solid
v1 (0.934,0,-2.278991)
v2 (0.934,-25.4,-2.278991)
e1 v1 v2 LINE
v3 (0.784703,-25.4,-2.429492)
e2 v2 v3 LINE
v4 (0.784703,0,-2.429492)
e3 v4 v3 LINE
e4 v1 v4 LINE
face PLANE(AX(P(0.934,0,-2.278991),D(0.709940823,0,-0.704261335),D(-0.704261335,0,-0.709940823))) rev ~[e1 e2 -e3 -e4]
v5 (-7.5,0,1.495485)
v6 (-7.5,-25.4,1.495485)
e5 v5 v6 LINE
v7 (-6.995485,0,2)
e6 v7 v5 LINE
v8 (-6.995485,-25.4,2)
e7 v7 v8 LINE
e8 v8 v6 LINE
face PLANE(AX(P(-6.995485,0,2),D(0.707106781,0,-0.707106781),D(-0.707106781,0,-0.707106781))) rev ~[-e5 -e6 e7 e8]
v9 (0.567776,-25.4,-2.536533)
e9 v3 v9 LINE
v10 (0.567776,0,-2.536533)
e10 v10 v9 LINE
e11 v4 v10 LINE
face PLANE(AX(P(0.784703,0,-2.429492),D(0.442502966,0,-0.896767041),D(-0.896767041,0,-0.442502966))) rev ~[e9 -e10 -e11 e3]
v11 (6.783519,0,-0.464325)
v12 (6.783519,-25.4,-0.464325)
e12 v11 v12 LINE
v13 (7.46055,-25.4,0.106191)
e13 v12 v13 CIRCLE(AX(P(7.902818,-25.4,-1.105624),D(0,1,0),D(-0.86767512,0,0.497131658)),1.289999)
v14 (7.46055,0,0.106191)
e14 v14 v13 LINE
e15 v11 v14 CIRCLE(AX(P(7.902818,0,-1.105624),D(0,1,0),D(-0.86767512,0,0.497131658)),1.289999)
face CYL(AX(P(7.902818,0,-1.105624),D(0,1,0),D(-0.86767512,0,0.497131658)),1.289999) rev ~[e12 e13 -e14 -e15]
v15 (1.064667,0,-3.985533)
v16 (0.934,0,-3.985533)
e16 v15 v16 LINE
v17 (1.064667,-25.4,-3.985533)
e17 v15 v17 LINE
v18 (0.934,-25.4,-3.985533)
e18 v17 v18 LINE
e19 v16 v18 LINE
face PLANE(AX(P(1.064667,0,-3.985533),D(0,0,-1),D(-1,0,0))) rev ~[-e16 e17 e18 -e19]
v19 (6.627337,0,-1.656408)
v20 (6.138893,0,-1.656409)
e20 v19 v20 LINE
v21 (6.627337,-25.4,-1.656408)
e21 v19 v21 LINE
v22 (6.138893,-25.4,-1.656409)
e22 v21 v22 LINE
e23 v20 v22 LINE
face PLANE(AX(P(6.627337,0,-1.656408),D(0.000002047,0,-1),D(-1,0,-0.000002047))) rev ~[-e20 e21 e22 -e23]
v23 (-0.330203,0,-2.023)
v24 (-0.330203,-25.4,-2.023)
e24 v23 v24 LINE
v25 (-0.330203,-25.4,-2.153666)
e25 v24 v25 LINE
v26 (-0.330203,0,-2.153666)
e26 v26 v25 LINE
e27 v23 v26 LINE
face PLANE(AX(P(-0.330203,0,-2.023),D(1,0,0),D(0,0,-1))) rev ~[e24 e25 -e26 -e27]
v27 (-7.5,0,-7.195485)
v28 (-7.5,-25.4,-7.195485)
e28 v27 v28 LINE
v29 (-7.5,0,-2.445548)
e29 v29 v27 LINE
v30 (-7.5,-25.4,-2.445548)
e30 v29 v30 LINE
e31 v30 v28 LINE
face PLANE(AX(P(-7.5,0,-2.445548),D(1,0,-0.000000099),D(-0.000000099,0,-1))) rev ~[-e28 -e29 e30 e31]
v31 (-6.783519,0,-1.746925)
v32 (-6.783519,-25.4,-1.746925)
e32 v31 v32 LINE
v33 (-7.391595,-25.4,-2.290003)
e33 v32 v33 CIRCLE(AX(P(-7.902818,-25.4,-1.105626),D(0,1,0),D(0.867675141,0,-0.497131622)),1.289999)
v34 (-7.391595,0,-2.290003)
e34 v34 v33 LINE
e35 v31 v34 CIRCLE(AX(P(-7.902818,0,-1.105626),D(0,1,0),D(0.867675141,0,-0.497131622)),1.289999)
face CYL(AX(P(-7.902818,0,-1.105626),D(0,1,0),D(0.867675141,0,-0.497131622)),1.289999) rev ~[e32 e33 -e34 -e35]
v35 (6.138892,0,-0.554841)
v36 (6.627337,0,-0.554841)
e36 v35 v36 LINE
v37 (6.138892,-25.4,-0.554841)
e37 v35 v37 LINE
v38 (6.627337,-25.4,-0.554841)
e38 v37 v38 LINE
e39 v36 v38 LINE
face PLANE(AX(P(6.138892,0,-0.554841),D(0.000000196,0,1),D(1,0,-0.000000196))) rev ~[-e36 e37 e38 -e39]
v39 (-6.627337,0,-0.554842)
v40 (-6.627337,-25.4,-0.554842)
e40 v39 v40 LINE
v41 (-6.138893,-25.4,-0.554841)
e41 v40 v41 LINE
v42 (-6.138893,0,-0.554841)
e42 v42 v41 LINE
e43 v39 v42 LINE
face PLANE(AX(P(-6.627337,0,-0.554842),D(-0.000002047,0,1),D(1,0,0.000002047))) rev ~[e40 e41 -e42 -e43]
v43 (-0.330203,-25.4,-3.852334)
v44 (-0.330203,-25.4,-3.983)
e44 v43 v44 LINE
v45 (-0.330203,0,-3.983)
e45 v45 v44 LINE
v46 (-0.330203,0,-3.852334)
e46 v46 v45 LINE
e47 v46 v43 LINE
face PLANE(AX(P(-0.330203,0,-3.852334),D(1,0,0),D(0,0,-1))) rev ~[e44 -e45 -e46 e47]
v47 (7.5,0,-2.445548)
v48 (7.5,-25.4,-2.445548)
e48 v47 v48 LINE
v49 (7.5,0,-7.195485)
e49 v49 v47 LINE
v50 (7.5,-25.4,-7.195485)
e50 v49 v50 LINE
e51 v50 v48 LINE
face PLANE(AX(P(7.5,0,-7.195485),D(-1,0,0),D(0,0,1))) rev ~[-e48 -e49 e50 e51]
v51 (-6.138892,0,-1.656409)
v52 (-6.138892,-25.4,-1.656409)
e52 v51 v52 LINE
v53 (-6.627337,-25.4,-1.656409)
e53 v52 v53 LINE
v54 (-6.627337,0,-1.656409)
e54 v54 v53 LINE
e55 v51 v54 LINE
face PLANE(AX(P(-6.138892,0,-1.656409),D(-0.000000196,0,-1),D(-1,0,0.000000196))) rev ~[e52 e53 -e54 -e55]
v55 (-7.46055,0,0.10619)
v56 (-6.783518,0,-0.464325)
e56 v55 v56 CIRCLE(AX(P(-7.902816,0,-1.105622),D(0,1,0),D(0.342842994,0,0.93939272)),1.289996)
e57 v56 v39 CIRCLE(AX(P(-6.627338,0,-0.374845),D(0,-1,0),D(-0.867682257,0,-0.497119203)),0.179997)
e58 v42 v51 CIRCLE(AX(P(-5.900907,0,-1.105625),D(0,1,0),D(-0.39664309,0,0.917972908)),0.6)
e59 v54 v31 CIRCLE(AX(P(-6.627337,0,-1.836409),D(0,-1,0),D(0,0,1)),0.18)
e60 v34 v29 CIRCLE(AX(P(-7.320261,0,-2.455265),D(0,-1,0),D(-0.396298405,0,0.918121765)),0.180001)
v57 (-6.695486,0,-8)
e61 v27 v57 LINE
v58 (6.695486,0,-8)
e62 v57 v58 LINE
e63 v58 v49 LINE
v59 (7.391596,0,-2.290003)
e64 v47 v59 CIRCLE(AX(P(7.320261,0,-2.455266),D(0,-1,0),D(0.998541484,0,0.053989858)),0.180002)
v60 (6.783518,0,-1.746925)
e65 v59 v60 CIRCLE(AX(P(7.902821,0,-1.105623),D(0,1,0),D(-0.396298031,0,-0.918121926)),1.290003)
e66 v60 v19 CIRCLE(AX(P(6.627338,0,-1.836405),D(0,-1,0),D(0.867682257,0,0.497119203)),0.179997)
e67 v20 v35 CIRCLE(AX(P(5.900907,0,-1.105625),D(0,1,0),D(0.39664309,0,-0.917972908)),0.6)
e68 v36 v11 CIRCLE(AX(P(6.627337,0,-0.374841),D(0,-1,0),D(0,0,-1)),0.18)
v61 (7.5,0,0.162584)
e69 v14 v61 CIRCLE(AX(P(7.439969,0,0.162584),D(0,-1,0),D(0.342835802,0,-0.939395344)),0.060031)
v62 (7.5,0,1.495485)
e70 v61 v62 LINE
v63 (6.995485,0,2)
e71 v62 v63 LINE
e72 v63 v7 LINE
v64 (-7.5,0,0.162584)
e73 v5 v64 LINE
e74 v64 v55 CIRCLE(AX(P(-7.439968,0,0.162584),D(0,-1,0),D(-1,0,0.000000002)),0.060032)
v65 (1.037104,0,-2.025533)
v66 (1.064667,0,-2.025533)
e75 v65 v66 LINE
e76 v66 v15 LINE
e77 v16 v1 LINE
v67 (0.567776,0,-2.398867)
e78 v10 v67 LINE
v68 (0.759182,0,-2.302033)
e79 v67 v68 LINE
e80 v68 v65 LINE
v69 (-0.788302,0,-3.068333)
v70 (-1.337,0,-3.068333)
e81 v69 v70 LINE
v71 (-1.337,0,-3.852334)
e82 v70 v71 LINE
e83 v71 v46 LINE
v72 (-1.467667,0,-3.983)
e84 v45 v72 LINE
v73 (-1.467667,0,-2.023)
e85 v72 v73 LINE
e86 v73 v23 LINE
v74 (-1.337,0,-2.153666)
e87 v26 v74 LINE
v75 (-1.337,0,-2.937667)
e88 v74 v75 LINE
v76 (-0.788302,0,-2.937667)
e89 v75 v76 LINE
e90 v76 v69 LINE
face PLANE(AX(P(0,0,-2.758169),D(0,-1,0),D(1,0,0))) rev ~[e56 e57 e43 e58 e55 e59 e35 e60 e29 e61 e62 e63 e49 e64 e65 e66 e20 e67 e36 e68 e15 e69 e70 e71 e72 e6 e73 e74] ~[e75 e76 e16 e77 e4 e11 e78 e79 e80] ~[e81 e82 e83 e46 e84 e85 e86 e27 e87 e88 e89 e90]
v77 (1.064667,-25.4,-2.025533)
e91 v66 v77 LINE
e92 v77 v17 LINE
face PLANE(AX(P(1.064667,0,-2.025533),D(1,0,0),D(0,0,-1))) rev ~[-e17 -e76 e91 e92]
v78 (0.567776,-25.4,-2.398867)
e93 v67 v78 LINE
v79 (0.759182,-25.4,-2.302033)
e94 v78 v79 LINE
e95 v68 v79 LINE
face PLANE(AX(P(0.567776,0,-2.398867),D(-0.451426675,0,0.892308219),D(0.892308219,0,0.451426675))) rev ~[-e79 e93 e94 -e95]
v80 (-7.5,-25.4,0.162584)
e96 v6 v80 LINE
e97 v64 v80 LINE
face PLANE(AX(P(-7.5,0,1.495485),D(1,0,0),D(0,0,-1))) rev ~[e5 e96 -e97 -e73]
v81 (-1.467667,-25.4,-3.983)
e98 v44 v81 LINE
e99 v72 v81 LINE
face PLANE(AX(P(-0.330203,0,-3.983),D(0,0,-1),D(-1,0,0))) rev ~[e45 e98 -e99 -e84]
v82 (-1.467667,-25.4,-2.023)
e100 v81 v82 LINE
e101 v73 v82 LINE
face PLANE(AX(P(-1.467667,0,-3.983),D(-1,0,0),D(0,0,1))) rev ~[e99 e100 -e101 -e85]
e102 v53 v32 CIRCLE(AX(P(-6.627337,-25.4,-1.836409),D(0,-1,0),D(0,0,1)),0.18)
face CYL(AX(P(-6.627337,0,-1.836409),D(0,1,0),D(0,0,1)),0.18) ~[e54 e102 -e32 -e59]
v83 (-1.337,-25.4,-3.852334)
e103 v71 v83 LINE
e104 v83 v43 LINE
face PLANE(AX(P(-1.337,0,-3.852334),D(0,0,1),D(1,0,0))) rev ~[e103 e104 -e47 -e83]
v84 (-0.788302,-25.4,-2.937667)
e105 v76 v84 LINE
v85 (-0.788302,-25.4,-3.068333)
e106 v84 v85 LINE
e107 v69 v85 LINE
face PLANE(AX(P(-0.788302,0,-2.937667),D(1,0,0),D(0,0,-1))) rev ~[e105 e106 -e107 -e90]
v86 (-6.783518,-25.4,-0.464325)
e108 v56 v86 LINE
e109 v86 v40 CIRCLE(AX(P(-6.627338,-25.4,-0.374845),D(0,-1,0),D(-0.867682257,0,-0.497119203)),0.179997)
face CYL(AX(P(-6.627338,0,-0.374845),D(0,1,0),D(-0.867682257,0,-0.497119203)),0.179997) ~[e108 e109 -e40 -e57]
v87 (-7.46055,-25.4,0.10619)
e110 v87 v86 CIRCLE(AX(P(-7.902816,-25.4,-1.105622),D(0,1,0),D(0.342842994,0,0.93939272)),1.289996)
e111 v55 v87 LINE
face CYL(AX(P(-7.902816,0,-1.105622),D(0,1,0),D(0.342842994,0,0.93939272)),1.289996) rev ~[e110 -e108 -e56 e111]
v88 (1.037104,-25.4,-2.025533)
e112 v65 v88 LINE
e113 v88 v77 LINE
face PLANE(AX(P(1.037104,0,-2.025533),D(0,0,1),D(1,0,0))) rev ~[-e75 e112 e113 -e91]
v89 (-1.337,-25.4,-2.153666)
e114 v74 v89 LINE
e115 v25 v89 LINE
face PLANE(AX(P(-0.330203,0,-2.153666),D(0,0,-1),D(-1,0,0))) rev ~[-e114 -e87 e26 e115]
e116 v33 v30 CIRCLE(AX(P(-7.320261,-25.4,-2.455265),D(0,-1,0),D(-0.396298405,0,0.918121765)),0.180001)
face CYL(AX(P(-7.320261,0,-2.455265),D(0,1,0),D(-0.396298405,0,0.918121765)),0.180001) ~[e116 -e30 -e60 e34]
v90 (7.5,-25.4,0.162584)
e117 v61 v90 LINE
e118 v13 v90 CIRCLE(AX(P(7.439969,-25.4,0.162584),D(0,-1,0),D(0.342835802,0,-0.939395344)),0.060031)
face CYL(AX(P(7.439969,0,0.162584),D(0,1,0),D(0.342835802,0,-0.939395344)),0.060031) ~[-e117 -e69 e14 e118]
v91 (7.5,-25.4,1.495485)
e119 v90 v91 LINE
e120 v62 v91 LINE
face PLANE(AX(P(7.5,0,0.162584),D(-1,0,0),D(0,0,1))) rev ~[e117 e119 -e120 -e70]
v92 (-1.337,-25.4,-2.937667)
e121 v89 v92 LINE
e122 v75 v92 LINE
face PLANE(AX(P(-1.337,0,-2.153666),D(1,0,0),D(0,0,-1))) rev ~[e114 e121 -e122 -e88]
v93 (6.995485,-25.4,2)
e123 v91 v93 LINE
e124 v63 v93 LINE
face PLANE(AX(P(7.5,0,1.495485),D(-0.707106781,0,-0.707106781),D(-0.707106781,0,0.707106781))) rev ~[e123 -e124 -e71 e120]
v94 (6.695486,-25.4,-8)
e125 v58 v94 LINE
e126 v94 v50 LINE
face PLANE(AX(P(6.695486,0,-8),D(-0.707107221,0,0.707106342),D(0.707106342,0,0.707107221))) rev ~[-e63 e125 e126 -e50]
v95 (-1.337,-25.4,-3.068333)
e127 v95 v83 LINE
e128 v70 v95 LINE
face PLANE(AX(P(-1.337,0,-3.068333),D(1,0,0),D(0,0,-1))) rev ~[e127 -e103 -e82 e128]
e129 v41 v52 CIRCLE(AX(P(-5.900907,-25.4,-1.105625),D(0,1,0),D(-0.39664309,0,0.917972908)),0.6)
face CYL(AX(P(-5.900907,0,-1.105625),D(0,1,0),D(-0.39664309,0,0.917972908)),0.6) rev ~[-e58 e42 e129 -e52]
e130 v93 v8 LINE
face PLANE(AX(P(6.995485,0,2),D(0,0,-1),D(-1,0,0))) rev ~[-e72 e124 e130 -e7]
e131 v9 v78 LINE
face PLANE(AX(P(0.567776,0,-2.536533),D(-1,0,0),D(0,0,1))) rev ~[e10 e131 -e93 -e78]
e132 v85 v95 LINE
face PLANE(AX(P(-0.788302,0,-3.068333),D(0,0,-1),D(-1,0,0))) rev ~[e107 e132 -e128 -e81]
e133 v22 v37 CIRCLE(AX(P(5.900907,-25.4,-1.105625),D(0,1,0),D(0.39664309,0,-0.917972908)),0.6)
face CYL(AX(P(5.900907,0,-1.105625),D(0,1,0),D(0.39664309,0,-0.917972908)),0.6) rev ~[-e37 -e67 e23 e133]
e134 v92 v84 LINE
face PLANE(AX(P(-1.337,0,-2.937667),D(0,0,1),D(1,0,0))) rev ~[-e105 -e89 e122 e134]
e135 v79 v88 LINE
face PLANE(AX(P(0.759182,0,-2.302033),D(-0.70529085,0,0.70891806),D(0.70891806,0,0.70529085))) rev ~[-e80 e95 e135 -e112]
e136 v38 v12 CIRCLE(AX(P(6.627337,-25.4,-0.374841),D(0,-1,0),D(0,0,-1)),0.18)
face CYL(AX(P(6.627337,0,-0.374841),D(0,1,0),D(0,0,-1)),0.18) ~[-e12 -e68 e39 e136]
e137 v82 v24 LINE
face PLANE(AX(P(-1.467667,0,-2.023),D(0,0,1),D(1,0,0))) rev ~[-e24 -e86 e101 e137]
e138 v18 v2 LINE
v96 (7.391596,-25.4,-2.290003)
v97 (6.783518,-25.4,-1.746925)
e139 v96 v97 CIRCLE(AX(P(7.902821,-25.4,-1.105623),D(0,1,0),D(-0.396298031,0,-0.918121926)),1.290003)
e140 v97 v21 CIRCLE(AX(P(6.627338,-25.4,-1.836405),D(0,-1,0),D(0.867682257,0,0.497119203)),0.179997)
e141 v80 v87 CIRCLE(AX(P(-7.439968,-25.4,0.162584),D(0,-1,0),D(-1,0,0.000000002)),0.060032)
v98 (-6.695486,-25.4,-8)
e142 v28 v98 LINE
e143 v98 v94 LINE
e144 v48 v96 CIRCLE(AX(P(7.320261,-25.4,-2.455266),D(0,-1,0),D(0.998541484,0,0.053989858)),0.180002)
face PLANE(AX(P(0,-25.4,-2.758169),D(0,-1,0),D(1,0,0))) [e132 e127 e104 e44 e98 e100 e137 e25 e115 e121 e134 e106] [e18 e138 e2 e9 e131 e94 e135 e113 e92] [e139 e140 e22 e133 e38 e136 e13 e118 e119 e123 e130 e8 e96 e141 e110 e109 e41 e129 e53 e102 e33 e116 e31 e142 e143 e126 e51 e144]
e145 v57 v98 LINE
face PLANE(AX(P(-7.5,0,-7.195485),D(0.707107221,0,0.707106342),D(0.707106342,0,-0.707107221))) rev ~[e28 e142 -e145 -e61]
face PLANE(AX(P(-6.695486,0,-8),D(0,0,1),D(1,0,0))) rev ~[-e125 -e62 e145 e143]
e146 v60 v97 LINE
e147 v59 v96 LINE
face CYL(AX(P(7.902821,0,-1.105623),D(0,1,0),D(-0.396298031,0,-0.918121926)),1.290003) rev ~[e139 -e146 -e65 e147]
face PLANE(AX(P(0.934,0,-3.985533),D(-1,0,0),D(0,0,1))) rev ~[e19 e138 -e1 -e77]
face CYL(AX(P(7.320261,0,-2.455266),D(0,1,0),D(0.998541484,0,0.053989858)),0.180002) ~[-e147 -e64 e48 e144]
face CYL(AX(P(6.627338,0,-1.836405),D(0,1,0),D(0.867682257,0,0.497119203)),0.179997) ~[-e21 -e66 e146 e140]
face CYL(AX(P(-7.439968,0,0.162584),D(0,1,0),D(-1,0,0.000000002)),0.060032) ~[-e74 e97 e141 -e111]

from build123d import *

# Parameters (mm, degrees)
F1_DEPTH = 25.4


# Not quite as in the source:
# - ends of sketch curves that miss each other by under 0.0002 mm in the source are joined


with BuildPart() as f1:
    # F0 (on Front) → F1 (new body)
    with BuildSketch(Plane.XZ):
        with BuildLine():
            Line((-7.5, -7.195485), (-6.695486, -8))
            Line((-6.695486, -8), (6.695486, -8))
            Line((6.695486, -8), (7.5, -7.195485))
            Line((7.5, -7.195485), (7.5, -2.445548))
            ThreePointArc((7.5, -2.445548), (7.4679364252, -2.3523462741), (7.3915955611, -2.2900030169))
            ThreePointArc((7.3915955611, -2.2900030169), (7.0435250993, -2.0677653184), (6.7835181408, -1.7469249193))
            ThreePointArc((6.7835181408, -1.7469249193), (6.7175952727, -1.6806726709), (6.627337, -1.656408))
            Line((6.627337, -1.656408), (6.138893, -1.656409))
            ThreePointArc((6.138893, -1.656409), (5.300907, -1.105625), (6.1388920414, -0.5548409043))
            Line((6.1388920414, -0.5548409043), (6.627337, -0.554841))
            ThreePointArc((6.627337, -0.554841), (6.7175947713, -0.5305764639), (6.7835185098, -0.4643247191))
            ThreePointArc((6.7835185098, -0.4643247191), (7.0715565387, -0.1191653097), (7.4605499849, 0.1061910414))
            ThreePointArc((7.4605499849, 0.1061910414), (7.4891585913, 0.1281728571), (7.5, 0.162584))
            Line((7.5, 0.162584), (7.5, 1.495485))
            Line((7.5, 1.495485), (6.995485, 2))
            Line((6.995485, 2), (-6.995485, 2))
            Line((-6.995485, 2), (-7.5, 1.495485))
            Line((-7.5, 1.495485), (-7.5, 0.162584))
            ThreePointArc((-7.5, 0.162584), (-7.489158493, 0.1281727166), (-7.460549826, 0.1061904768))
            ThreePointArc((-7.460549826, 0.1061904768), (-7.0715565387, -0.1191653097), (-6.7835181408, -0.4643250807))
            ThreePointArc((-6.7835181408, -0.4643250807), (-6.7175952727, -0.5305773291), (-6.627337, -0.554842))
            Line((-6.627337, -0.554842), (-6.138893, -0.554841))
            ThreePointArc((-6.138893, -0.554841), (-5.300907, -1.105625), (-6.1388920414, -1.6564090957))
            Line((-6.1388920414, -1.6564090957), (-6.627337, -1.656409))
            ThreePointArc((-6.627337, -1.656409), (-6.7175947713, -1.6806735361), (-6.7835185098, -1.7469252809))
            ThreePointArc((-6.7835185098, -1.7469252809), (-7.0435250993, -2.0677653184), (-7.3915951882, -2.290002564))
            ThreePointArc((-7.3915951882, -2.290002564), (-7.467936276, -2.35234606), (-7.499999532, -2.4455480253))
            Line((-7.499999532, -2.4455480253), (-7.5, -7.195485))
        make_face()
        Polygon((-0.330203, -3.983), (-1.467667, -3.983), (-1.467667, -2.023), (-0.330203, -2.023), (-0.330203, -2.153666), (-1.337, -2.153666), (-1.337, -2.937667), (-0.788302, -2.937667), (-0.788302, -3.068333), (-1.337, -3.068333), (-1.337, -3.852334), (-0.330203, -3.852334), align=None, mode=Mode.SUBTRACT)
        Polygon((1.064667, -3.985533), (0.934, -3.985533), (0.934, -2.278991), (0.784703, -2.429492), (0.567776, -2.536533), (0.567776, -2.398867), (0.759182, -2.302033), (1.037104, -2.025533), (1.064667, -2.025533), align=None, mode=Mode.SUBTRACT)
    extrude(amount=F1_DEPTH)


solid = f1.part
